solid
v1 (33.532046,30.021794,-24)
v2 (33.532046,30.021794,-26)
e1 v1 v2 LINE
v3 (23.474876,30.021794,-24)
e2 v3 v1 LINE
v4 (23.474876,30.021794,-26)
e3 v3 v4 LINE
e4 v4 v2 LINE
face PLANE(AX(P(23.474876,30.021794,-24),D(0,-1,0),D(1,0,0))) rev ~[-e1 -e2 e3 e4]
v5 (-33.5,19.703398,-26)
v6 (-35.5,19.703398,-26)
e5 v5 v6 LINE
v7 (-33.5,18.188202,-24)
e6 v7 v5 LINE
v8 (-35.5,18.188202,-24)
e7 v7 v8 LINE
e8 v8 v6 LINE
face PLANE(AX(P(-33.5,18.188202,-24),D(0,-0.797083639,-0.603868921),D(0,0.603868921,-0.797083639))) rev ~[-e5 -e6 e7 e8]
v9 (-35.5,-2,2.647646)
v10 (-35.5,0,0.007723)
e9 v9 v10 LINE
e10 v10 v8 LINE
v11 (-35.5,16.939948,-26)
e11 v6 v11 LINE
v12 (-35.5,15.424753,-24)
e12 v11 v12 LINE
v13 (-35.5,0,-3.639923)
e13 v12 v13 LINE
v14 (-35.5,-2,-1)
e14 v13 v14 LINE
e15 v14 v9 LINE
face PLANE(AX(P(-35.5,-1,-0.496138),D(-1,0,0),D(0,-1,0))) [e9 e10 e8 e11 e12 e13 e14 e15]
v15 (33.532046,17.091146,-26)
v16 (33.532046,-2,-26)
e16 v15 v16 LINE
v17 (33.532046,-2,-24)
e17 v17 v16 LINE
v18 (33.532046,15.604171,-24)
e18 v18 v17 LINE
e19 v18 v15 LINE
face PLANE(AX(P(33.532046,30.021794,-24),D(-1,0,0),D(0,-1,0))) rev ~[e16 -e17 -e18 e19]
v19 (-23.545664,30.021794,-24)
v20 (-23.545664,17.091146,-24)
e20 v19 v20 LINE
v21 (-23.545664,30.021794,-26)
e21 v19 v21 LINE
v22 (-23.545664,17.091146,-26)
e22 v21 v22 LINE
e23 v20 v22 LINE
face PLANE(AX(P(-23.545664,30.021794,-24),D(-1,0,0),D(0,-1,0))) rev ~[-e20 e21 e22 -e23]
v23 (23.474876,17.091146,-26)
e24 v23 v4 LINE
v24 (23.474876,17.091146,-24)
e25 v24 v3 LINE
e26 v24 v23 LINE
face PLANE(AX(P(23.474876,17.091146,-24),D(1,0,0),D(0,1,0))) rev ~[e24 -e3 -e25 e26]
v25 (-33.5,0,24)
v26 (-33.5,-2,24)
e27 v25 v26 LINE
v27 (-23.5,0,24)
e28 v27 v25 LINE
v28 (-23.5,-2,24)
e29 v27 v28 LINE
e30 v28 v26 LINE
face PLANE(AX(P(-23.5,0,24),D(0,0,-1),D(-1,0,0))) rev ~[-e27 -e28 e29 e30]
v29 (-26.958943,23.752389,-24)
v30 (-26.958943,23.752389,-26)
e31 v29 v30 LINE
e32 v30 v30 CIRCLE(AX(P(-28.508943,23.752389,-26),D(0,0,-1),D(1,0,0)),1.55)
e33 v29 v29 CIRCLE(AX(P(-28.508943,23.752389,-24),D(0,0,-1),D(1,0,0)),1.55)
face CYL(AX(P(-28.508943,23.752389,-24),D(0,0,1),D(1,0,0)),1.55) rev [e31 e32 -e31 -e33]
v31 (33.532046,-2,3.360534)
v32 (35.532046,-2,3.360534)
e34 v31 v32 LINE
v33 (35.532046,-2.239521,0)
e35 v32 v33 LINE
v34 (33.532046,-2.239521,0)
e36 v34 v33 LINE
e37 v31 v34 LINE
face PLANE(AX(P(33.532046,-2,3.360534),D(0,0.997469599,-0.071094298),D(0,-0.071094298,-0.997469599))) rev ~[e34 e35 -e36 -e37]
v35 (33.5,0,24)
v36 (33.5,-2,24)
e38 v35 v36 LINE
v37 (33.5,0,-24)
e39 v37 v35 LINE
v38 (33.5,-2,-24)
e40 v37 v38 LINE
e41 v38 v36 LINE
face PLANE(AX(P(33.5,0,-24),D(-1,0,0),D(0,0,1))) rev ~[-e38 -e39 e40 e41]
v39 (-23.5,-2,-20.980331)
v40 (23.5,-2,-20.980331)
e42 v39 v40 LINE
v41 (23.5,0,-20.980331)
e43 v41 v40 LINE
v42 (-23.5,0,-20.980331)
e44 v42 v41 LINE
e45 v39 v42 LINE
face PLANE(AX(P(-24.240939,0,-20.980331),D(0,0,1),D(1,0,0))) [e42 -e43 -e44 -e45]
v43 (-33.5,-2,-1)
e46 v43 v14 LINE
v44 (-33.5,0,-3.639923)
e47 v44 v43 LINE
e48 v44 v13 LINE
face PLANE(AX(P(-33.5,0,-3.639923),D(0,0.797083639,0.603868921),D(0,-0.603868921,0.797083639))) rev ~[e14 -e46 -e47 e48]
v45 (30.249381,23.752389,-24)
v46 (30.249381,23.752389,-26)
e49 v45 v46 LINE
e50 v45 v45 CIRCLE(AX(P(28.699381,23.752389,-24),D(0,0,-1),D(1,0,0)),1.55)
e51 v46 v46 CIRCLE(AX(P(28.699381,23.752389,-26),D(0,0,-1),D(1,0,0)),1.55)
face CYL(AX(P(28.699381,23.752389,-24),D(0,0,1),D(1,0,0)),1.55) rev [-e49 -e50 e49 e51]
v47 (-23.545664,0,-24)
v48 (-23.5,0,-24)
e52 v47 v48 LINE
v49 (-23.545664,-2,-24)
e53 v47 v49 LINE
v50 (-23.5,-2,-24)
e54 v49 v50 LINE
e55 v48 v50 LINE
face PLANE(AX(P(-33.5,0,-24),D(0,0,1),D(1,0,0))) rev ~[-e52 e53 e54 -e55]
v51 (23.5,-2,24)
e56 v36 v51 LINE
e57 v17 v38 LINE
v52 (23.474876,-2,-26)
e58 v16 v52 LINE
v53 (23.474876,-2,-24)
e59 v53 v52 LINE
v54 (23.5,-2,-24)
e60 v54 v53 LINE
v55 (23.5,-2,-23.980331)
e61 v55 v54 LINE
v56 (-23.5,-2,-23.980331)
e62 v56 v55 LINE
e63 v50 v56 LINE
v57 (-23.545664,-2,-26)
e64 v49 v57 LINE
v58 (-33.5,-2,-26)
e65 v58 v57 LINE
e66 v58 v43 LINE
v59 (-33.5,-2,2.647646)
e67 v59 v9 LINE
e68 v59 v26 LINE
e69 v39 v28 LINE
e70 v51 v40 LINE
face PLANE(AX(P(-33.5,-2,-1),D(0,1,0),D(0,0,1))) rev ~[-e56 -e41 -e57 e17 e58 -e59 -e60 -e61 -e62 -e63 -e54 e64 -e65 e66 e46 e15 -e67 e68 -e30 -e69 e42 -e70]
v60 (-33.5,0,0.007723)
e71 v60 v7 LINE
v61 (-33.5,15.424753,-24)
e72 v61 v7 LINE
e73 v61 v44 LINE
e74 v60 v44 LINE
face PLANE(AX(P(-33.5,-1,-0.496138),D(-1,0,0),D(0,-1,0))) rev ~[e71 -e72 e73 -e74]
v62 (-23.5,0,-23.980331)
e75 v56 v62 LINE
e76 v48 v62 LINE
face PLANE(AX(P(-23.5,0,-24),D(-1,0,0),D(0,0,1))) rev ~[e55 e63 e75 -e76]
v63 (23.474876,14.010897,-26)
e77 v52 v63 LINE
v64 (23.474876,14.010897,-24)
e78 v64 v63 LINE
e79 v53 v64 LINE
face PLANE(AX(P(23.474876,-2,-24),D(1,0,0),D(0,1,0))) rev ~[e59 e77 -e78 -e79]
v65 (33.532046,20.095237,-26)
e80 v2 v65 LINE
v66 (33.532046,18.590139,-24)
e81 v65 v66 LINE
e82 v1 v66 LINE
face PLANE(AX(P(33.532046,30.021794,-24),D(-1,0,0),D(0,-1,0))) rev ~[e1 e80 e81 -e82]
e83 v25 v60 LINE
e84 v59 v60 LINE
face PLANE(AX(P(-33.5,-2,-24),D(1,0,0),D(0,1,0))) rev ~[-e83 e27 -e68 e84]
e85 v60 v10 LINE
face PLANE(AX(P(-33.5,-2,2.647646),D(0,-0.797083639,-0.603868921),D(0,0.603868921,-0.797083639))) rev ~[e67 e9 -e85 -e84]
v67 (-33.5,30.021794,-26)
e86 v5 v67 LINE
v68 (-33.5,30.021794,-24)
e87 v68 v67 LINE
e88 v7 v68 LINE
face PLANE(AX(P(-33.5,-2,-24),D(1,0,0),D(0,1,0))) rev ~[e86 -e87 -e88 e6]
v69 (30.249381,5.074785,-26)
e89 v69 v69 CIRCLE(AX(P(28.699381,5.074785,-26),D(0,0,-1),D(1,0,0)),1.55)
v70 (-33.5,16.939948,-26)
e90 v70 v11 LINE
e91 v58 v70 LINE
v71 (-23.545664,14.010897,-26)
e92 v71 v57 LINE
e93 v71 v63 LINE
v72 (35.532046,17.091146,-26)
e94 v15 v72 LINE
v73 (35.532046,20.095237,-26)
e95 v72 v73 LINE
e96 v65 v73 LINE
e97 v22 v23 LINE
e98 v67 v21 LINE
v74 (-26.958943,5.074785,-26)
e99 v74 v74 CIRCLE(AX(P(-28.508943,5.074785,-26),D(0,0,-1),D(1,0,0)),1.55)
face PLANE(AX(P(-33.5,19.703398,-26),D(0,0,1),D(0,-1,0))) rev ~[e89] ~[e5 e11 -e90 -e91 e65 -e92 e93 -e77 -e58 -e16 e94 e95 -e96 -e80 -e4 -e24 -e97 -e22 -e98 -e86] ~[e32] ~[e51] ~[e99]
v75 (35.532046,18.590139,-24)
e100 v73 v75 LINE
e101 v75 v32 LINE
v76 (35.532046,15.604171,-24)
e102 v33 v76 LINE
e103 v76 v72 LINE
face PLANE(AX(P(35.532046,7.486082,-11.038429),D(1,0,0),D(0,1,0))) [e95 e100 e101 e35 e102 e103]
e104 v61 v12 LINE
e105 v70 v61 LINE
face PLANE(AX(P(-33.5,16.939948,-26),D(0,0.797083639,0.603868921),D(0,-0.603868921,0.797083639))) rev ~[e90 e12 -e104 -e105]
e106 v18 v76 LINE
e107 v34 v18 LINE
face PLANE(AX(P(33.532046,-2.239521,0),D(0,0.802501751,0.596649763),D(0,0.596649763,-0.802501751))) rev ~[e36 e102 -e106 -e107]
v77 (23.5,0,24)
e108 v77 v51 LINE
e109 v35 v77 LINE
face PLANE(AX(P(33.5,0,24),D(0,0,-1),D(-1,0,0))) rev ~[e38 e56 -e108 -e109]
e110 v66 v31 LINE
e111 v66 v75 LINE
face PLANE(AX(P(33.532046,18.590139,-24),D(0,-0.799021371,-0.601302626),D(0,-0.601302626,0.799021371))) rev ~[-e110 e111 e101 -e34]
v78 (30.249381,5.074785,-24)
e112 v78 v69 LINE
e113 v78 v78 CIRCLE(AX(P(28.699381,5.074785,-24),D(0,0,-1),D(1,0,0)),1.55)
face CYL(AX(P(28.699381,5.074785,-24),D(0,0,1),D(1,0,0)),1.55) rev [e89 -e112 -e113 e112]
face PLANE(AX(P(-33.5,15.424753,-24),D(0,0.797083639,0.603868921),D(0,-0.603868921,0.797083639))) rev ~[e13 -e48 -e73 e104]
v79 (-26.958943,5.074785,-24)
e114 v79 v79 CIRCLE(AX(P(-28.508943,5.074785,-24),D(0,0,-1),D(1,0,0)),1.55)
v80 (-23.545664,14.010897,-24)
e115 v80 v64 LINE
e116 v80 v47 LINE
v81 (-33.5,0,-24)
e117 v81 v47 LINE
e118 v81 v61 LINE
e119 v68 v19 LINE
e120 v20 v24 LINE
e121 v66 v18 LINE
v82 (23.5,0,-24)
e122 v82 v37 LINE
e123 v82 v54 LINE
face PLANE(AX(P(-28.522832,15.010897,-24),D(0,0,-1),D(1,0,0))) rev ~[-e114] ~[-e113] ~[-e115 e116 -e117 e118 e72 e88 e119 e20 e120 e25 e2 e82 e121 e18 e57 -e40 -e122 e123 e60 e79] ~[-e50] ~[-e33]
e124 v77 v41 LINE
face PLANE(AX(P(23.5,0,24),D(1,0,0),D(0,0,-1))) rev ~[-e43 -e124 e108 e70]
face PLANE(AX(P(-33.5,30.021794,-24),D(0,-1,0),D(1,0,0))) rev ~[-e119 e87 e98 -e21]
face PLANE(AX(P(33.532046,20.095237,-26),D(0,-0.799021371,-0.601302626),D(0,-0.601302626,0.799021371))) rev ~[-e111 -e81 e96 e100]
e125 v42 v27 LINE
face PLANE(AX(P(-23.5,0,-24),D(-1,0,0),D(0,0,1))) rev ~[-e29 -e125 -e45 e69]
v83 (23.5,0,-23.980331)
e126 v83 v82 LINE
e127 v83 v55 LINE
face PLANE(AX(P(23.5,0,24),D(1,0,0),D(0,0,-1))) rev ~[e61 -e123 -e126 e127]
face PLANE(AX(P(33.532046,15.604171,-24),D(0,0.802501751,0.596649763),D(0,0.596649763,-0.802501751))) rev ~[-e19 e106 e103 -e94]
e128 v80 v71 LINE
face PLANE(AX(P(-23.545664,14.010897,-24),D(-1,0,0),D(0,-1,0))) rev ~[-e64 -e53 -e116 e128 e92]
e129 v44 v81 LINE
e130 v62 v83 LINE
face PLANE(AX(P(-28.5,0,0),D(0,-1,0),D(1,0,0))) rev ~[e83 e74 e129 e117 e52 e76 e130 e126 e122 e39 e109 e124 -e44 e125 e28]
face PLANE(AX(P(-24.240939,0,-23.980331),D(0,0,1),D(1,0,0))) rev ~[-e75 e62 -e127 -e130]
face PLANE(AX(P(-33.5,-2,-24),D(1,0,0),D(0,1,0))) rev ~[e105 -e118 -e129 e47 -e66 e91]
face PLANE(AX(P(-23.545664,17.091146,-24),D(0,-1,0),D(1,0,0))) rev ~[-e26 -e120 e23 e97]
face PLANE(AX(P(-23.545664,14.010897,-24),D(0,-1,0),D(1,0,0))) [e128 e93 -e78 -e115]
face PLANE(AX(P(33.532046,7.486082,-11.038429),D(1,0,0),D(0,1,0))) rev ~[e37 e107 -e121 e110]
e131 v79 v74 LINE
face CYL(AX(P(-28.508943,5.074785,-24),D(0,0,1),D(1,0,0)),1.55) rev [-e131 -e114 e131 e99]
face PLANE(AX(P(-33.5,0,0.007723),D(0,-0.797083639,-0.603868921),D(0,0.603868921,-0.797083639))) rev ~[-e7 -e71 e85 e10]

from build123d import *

# Parameters (mm, degrees)
F1_DEPTH = 2
F2_W     = 48.4285755818
F2_H     = 3
F3_DEPTH = 2
F4_R     = 1.55
F4_W     = 9.9543361962
F4_H     = 2
F4_W_2   = 47.0205396414
F4_H_2   = 3.0802486688
F5_DEPTH = 2
F7_DEPTH = 2
F9_DEPTH = 2


# Not quite as in the source:
# - a feature names something its author has since deleted; it is built from what else it names


with BuildPart() as f1:
    # F0 (on Front) → F1 (new body)
    with BuildSketch(Plane.XZ):
        Polygon((-23.5, 24), (-33.5, 24), (-33.5, -24), (-23.5, -24), (-23.5, -21), (-23.5, 20.9024734795), align=None)
    extrude(amount=F1_DEPTH)



with BuildPart() as f1b:
    # F0 (on Front) → F1, piece 2 (new body)
    with BuildSketch(Plane.XZ):
        Polygon((33.5, 24), (23.5, 24), (23.5, 20.9024734795), (23.5, -21), (23.5, -24), (33.5, -24), align=None)
    extrude(amount=F1_DEPTH)


with BuildPart() as f1_1:
    add(f1.part)

    add(f1b.part)  # F3 merges F1b
    # F2 (on Front) → F3 (join)
    with BuildSketch(Plane.XZ):
        with Locations((-0.0266507268, -22.4803313563)):
            Rectangle(F2_W, F2_H)
    extrude(amount=F3_DEPTH)

    # F4 (on face) → F5 (join)
    with BuildSketch(Plane(origin=(0, 0, -24), x_dir=(1, 0, 0), z_dir=(0, 0, -1))):
        Polygon((-23.5456638038, 0), (-33.5, 0), (-33.5, -30.0217941403), (-23.5456638038, -30.0217941403), (-23.5456638038, -17.091145739), (-23.5456638038, -14.0108970702), align=None)
        with Locations((-28.5089425743, -23.7523894757)):
            Circle(F4_R, mode=Mode.SUBTRACT)
        with Locations((-28.5089425743, -5.0747846253)):
            Circle(F4_R, mode=Mode.SUBTRACT)
        with Locations((-28.5228319019, 1)):
            Rectangle(F4_W, F4_H)
        Polygon((33.5320457816, 2), (23.4748758376, 2), (23.4748758376, -2.9849826824), (23.4748758376, -14.0108970702), (23.4748758376, -17.091145739), (23.4748758376, -30.0217941403), (33.5320457816, -30.0217941403), align=None)
        with Locations((28.699381277, -23.7523894757)):
            Circle(F4_R, mode=Mode.SUBTRACT)
        with Locations((28.699381277, -5.0747846253)):
            Circle(F4_R, mode=Mode.SUBTRACT)
        with Locations((-0.0353939831, -15.5510214046)):
            Rectangle(F4_W_2, F4_H_2)
    extrude(amount=F5_DEPTH)

    # F6 (on face) → F7 (join)
    with BuildSketch(Plane.YZ.offset(33.5320457816)):
        Polygon((-2, 3.3605340868), (-2.2395208944, 0), (15.6041713825, -24), (18.5901388697, -24), align=None)
        Polygon((18.5901388697, -24), (15.6041713825, -24), (17.091145739, -26), (20.0952365994, -26), align=None)
    extrude(amount=F7_DEPTH)

    # F8 (on face) → F9 (join)
    with BuildSketch(Plane(origin=(-33.5, 0, 0), x_dir=(0, -1, 0), z_dir=(-1, 0, 0))):
        Polygon((2, 2.6476460043), (0, 0.0077232947), (0, -3.6399227096), (2, -1), align=None)
        Polygon((0, 0.0077232947), (-18.1882016523, -24), (-15.4247525627, -24), (0, -3.6399227096), align=None)
        Polygon((-18.1882016523, -24), (-19.7033975273, -26), (-16.9399484377, -26), (-15.4247525627, -24), align=None)
    extrude(amount=F9_DEPTH)


solid = f1_1.part
